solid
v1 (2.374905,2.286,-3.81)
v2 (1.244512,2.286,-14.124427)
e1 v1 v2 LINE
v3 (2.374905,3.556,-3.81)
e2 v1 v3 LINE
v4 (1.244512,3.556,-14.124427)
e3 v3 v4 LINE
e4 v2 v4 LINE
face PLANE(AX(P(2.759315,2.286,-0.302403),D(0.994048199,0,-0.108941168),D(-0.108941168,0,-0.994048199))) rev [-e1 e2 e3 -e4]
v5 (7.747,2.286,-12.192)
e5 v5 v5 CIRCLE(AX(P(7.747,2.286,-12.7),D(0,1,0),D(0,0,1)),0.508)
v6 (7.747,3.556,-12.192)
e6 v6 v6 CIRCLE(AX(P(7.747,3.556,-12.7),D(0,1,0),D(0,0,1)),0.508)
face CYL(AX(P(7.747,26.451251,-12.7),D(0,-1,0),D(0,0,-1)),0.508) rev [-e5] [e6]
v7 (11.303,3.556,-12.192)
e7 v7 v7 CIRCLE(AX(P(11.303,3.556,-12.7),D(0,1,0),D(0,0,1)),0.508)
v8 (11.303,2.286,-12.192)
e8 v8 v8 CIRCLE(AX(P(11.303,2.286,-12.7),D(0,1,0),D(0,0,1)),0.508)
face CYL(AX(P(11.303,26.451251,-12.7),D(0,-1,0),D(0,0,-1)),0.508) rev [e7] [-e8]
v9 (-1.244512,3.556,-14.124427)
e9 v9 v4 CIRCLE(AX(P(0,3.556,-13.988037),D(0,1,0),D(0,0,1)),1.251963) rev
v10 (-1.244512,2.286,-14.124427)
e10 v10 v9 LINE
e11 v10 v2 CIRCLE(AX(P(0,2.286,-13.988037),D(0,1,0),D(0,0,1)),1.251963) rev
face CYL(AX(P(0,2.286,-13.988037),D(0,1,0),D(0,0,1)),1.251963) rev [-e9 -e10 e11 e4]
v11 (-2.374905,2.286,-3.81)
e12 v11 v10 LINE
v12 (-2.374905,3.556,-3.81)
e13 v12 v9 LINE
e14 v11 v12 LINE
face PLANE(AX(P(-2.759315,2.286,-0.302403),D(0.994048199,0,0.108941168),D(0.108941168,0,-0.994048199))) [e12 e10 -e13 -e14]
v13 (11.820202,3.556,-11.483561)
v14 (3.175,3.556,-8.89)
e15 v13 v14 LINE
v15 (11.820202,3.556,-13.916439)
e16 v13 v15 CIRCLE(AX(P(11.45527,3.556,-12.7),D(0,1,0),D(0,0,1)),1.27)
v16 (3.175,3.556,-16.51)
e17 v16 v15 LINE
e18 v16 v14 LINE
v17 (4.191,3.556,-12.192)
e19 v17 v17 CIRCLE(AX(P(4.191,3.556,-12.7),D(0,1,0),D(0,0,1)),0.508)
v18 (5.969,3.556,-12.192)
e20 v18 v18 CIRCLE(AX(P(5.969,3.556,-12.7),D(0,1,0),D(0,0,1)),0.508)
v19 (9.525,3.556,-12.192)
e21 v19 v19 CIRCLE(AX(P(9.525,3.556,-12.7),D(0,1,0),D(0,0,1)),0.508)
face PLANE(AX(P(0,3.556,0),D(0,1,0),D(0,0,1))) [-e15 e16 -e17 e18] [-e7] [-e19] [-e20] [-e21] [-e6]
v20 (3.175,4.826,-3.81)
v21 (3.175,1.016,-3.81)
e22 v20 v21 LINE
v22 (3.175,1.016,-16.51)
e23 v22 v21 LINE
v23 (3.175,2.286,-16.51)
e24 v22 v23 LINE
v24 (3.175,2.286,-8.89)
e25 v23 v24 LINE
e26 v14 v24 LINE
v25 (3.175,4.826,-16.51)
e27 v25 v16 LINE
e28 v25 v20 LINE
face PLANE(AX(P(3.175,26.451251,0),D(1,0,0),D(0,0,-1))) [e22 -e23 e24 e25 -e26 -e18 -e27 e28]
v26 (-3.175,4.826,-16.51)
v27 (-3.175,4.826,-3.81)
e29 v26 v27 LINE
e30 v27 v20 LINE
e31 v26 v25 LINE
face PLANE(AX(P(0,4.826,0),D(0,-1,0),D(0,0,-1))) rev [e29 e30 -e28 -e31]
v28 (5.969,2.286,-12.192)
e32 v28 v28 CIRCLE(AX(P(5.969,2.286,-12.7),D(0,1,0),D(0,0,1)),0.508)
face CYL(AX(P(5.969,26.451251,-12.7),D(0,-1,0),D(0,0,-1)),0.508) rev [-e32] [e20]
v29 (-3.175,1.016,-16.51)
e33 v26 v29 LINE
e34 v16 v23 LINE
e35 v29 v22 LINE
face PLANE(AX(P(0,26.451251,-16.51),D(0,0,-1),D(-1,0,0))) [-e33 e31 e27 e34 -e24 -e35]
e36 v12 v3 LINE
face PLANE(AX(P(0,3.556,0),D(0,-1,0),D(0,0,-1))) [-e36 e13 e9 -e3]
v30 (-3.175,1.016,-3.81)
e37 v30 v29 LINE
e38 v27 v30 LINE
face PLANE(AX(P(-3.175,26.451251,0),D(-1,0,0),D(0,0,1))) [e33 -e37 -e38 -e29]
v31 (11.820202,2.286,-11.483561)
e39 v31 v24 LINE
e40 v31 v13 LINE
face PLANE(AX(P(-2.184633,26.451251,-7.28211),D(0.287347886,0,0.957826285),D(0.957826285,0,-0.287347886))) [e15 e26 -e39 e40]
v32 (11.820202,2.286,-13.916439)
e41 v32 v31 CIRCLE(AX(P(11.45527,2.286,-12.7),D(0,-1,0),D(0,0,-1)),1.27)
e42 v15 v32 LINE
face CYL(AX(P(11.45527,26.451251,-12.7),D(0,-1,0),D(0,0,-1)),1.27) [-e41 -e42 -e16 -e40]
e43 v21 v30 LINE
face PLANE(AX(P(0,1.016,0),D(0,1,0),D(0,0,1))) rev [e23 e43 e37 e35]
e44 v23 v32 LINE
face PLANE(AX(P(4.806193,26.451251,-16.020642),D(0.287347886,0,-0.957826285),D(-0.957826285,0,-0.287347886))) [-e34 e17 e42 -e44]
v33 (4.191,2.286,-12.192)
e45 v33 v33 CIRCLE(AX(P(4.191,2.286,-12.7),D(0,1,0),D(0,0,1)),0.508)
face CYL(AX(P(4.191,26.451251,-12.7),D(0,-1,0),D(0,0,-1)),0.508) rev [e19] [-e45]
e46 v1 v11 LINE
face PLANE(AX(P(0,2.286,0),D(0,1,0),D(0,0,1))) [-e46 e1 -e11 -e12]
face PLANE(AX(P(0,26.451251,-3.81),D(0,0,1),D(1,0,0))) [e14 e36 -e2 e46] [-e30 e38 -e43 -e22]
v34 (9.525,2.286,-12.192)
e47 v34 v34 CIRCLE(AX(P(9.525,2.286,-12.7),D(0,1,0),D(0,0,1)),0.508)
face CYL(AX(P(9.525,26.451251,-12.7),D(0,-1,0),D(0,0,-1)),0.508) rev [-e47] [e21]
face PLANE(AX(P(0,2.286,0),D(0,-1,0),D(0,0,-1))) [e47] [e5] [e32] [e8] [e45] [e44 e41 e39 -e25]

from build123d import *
from build123d.topology import SkipClean

# Parameters (mm, degrees)
SKETCH1_R               = 3.429
SKETCH1_R_2             = 2.286
BOSS_EXTRUDE1_DEPTH     = 3.556
BOSS_EXTRUDE2_START     = -1.27
BOSS_EXTRUDE2_DEPTH     = 1.27
BOSS_EXTRUDE3_START     = -1.27
SKETCH2_3_R             = 2.286
SKETCH2_3_R_2           = 1.27
BOSS_EXTRUDE3_DEPTH     = 0.254
SKETCH3_R               = 0.508
CUT_EXTRUDE1_DEPTH      = 17.020635974
LPATTERN1_COUNT         = 6
LPATTERN1_PITCH         = 1.778
CUT_EXTRUDE2_DEPTH      = 17.020635974
CUT_EXTRUDE2_DEPTH_BACK = 17.020635974
SKETCH4_W               = 4.326879353
SKETCH4_H               = 6.724216597
BOSS_EXTRUDE4_START     = 2.286
SKETCH5_R               = 0.508
BOSS_EXTRUDE4_DEPTH     = 1.27
COMBINE1_OUTLINE_R      = 0.508
COMBINE1_OUTLINE_R_2    = 1.27
COMBINE1_DEPTH          = 3.556
SKETCH6_W               = 6.35
SKETCH6_H               = 12.7
BOSS_EXTRUDE5_DEPTH     = 1.27
BOSS_EXTRUDE6_START     = -1.27
SKETCH6_2_W             = 6.35
SKETCH6_2_H             = 12.7
BOSS_EXTRUDE6_DEPTH     = 1.27
FILLET1_R               = 1.27


# Read off the part's stored shape, not the designer's step: Combine1
with BuildPart() as part:
    # Sketch1 → Boss-Extrude1 (new body)
    with BuildSketch(Plane(origin=(0, 0, 0), x_dir=(1, 0, 0), z_dir=(0, 1, 0))):
        with Locations(Location((0, 0, 0), (0, 0, 270))):
            Circle(SKETCH1_R)
        with Locations(Location((0, 0, 0), (0, 0, 270))):
            Circle(SKETCH1_R_2, mode=Mode.SUBTRACT)
    extrude(amount=BOSS_EXTRUDE1_DEPTH)

    # Sketch2 → Boss-Extrude2 (add)
    with BuildSketch(Plane(origin=(0, 3.556, 0), x_dir=(1, 0, 0), z_dir=(0, 1, 0)).offset(BOSS_EXTRUDE2_START)):
        with BuildLine():
            ThreePointArc((-2.54, 2.303571358), (-1.389081498, 3.135042837), (0, 3.429))
            Line((0, 3.429), (0, 15.24))
            ThreePointArc((0, 15.24), (-0.835660201, 14.92028345), (-1.244511661, 14.124427226))
            Line((-1.244511661, 14.124427226), (-2.54, 2.303571358))
        make_face()
        with BuildLine():
            Line((0, 15.24), (0, 3.429))
            ThreePointArc((0, 3.429), (1.389081498, 3.135042837), (2.54, 2.303571358))
            Line((2.54, 2.303571358), (1.244511661, 14.124427226))
            ThreePointArc((1.244511661, 14.124427226), (0.835660201, 14.92028345), (0, 15.24))
        make_face()
    extrude(amount=BOSS_EXTRUDE2_DEPTH)

    # Sketch2<3> → Boss-Extrude3 (add)
    with BuildSketch(Plane(origin=(0, 3.556, 0), x_dir=(1, 0, 0), z_dir=(0, 1, 0)).offset(BOSS_EXTRUDE3_START)):
        with Locations(Location((0, 0, 0), (0, 0, 270))):
            Circle(SKETCH2_3_R)
        with Locations(Location((0, 0, 0), (0, 0, 270))):
            Circle(SKETCH2_3_R_2, mode=Mode.SUBTRACT)
    extrude(amount=BOSS_EXTRUDE3_DEPTH)

    # Sketch3 → Cut-Extrude1 (cut, through all)
    with BuildSketch(Plane(origin=(0, 3.556, 0), x_dir=(1, 0, 0), z_dir=(0, 1, 0))):
        with Locations(Location((0, 5.08, 0), (0, 0, 270))):
            Circle(SKETCH3_R)
    cut_extrude1 = extrude(amount=-CUT_EXTRUDE1_DEPTH, mode=Mode.SUBTRACT)

    # LPattern1: Cut-Extrude1 ×6
    with Locations(*[(0, 0, -i * LPATTERN1_PITCH) for i in range(1, LPATTERN1_COUNT)]):
        add(cut_extrude1, mode=Mode.SUBTRACT)

    # Sketch4 → Cut-Extrude2 (cut, two sides: drawn at the far end of the back side and taken through both)
    with BuildSketch(Plane(origin=(0, 0, 0), x_dir=(0, 0, -1), z_dir=(1, 0, 0)).offset(-CUT_EXTRUDE2_DEPTH_BACK)):
        with Locations((-2.163439677, 3.362108299)):
            Rectangle(SKETCH4_W, SKETCH4_H)
    extrude(amount=CUT_EXTRUDE2_DEPTH + CUT_EXTRUDE2_DEPTH_BACK, mode=Mode.SUBTRACT)

    # Mirror1: part across plane


with BuildPart() as part_1:
    with SkipClean():  # the faces are left unmerged after this step: merging them gives an invalid solid
        add(part.part)
        add(part.part.mirror(Plane.XY))


with BuildPart() as body_2:
    # Sketch5 → Boss-Extrude4 (new body)
    with BuildSketch(Plane(origin=(0, 0, 0), x_dir=(1, 0, 0), z_dir=(0, 1, 0)).offset(BOSS_EXTRUDE4_START)):
        Polygon((3.175, 16.51), (15.875, 12.7), (3.175, 8.89), (3.175, 3.81), (-3.175, 3.81), (-3.175, 16.51), align=None)
        with Locations(Location((4.191, 12.7, 0), (0, 0, 270))):
            Circle(SKETCH5_R, mode=Mode.SUBTRACT)
        with Locations(Location((5.969, 12.7, 0), (0, 0, 270))):
            Circle(SKETCH5_R, mode=Mode.SUBTRACT)
        with Locations(Location((7.747, 12.7, 0), (0, 0, 270))):
            Circle(SKETCH5_R, mode=Mode.SUBTRACT)
        with Locations(Location((9.525, 12.7, 0), (0, 0, 270))):
            Circle(SKETCH5_R, mode=Mode.SUBTRACT)
        with Locations(Location((11.303, 12.7, 0), (0, 0, 270))):
            Circle(SKETCH5_R, mode=Mode.SUBTRACT)
    extrude(amount=BOSS_EXTRUDE4_DEPTH)


with BuildPart() as combine1_tool:
    # Combine1 outline → Combine1 (new body)
    with BuildSketch(Plane(origin=(0, 0, 0), x_dir=(1, 0, 0), z_dir=(0, 1, 0))):
        with BuildLine():
            ThreePointArc((2.54, -2.303571358), (3.429, 0), (2.54, 2.303571358))
            Line((2.54, 2.303571358), (1.244511661, 14.124427226))
            ThreePointArc((1.244511661, 14.124427226), (0, 15.24), (-1.244511661, 14.124427226))
            Line((-1.244511661, 14.124427226), (-2.54, 2.303571358))
            ThreePointArc((-2.54, 2.303571358), (-3.429, 0), (-2.54, -2.303571358))
            Line((-2.54, -2.303571358), (-1.244511661, -14.124427226))
            ThreePointArc((-1.244511661, -14.124427226), (0, -15.24), (1.244511661, -14.124427226))
            Line((1.244511661, -14.124427226), (2.54, -2.303571358))
        make_face()
        with Locations((0, -5.08)):
            Circle(COMBINE1_OUTLINE_R, mode=Mode.SUBTRACT)
        with Locations((0, -13.97)):
            Circle(COMBINE1_OUTLINE_R, mode=Mode.SUBTRACT)
        with Locations((0, -12.192)):
            Circle(COMBINE1_OUTLINE_R, mode=Mode.SUBTRACT)
        with Locations((0, -10.414)):
            Circle(COMBINE1_OUTLINE_R, mode=Mode.SUBTRACT)
        with Locations((0, -8.636)):
            Circle(COMBINE1_OUTLINE_R, mode=Mode.SUBTRACT)
        with Locations((0, -6.858)):
            Circle(COMBINE1_OUTLINE_R, mode=Mode.SUBTRACT)
        Circle(COMBINE1_OUTLINE_R_2, mode=Mode.SUBTRACT)
    extrude(amount=COMBINE1_DEPTH)


with BuildPart() as part_2:
    add(part_1.part)

    # Combine1: cut by combine1_tool
    add(combine1_tool.part, mode=Mode.SUBTRACT)


with BuildPart() as body_2_1:
    add(body_2.part)

    # Combine1: cut by combine1_tool
    add(combine1_tool.part, mode=Mode.SUBTRACT)

    # Sketch6 → Boss-Extrude5 (add)
    with BuildSketch(Plane.XZ.offset(-2.286)):
        with Locations((0, -10.16)):
            Rectangle(SKETCH6_W, SKETCH6_H)
    extrude(amount=BOSS_EXTRUDE5_DEPTH)

    # Sketch6<2> → Boss-Extrude6 (add)
    with BuildSketch(Plane.XZ.offset(-2.286).offset(BOSS_EXTRUDE6_START)):
        with Locations((0, -10.16)):
            Rectangle(SKETCH6_2_W, SKETCH6_2_H)
    extrude(amount=-BOSS_EXTRUDE6_DEPTH)

    # Fillet1
    fillet1_edges = [body_2_1.edges().sort_by_distance(p)[0] for p in [
        (15.875, 2.921, -12.7),
    ]]
    fillet(fillet1_edges, radius=FILLET1_R)


solid = body_2_1.part
